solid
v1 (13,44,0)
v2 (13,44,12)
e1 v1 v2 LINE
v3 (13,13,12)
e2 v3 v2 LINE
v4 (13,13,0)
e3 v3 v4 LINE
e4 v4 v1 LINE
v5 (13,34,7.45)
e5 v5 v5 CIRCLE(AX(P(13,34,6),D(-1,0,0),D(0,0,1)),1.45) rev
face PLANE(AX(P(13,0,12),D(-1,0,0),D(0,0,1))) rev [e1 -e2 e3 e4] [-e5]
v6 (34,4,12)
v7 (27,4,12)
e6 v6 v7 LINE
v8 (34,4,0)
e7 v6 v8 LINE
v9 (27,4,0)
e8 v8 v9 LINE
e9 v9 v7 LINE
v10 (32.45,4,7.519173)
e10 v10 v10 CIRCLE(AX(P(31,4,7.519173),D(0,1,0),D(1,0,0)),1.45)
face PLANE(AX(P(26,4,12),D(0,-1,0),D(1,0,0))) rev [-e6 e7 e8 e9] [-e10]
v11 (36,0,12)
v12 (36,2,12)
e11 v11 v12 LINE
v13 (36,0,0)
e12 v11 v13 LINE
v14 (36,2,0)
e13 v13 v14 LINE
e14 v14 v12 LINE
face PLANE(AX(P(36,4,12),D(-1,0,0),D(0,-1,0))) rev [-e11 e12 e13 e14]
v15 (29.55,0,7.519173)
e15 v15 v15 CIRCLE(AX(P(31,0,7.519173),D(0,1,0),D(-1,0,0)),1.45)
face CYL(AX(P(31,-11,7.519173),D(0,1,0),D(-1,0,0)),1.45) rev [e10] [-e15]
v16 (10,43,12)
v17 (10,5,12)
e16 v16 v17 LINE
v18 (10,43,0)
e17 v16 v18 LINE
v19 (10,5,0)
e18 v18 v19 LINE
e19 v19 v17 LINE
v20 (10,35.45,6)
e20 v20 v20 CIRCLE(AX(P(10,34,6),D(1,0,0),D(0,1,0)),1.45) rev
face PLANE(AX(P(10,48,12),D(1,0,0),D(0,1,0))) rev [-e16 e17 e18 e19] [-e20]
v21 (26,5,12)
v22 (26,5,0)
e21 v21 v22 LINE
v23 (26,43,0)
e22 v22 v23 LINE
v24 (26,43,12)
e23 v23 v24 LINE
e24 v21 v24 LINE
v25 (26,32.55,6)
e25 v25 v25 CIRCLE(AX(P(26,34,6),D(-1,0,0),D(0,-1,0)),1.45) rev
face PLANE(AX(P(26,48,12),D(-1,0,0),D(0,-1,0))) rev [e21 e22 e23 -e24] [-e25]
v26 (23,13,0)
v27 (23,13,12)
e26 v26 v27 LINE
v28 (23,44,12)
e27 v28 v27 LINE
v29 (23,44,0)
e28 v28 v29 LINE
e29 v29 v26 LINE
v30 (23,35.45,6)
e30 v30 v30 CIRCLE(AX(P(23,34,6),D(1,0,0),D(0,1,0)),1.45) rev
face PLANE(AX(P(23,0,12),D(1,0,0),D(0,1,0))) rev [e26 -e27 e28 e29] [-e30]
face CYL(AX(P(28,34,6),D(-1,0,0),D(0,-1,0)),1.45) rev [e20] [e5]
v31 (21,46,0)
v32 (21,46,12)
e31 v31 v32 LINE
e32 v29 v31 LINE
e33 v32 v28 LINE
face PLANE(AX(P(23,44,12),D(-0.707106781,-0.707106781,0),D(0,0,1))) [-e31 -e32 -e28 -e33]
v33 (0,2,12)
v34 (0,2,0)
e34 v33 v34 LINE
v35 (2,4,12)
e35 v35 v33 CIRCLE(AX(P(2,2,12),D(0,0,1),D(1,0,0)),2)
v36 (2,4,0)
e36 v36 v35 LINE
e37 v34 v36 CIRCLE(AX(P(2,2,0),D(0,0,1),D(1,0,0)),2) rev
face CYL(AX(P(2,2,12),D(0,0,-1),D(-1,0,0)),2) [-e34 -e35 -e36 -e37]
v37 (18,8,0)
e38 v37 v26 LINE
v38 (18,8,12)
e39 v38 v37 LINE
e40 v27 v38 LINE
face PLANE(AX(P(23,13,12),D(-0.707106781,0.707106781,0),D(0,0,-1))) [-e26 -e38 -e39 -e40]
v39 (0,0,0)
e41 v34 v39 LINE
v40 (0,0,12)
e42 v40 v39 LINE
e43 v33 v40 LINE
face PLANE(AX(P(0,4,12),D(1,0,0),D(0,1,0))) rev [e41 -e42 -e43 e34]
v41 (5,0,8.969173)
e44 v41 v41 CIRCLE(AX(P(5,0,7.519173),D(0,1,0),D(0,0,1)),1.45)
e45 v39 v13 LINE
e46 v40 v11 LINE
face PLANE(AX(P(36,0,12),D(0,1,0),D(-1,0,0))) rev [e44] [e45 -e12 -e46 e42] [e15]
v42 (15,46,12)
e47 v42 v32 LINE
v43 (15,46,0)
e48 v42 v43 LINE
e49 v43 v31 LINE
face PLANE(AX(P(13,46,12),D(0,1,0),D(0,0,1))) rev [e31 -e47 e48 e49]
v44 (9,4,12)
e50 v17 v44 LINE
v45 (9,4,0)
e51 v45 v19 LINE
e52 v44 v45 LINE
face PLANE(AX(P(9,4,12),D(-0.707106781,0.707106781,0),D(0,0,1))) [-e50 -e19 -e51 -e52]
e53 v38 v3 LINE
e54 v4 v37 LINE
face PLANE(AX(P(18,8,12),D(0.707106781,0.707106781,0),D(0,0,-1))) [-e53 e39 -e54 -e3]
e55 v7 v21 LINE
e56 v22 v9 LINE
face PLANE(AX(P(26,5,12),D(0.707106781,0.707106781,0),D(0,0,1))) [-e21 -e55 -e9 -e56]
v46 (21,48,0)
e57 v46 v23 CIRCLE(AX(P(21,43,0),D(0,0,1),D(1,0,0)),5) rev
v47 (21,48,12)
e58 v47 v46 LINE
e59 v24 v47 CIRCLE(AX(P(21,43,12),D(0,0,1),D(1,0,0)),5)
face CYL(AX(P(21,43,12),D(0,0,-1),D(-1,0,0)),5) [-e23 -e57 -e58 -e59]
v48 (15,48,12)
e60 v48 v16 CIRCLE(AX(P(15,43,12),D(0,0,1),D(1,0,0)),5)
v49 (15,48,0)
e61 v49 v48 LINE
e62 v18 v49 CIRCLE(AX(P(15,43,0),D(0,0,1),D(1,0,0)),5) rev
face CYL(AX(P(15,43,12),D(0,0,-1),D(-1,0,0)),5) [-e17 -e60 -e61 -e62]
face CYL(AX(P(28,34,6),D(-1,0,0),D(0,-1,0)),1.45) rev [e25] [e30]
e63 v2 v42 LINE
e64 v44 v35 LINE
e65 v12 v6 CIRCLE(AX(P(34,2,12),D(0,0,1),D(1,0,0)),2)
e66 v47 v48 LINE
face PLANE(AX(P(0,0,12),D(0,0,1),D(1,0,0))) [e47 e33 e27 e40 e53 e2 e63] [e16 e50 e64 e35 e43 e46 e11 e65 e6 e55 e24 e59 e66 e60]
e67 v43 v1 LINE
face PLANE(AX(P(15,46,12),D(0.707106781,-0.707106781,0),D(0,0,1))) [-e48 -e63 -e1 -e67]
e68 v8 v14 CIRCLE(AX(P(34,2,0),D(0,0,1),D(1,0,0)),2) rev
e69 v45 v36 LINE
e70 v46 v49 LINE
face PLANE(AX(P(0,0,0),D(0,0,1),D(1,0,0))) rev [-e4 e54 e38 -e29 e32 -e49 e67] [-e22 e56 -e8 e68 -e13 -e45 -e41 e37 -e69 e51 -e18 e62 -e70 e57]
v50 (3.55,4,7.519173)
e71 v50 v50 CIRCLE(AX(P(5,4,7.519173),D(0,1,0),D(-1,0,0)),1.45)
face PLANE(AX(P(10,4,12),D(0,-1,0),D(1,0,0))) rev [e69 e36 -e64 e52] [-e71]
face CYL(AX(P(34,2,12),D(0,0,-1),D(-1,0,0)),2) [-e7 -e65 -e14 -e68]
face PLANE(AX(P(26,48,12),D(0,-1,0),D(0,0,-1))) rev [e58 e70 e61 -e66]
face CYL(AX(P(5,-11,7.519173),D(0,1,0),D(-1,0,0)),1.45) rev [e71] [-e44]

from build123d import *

# Parameters (mm, degrees)
EXTRUDE_1_DEPTH          = 12
CUT_EXTRUDE_1_DEPTH      = 15
CUT_EXTRUDE_1_DEPTH_BACK = 15
SKETCH_2_R               = 1.45
SKETCH_3_R               = 1.45
CUT_EXTRUDE_2_DEPTH      = 15
FILLET_2_R               = 5
FILLET_3_R               = 2
CHAMFER_1_SIZE           = 2
SKETCH_4_W               = 12
SKETCH_4_H               = 8
EXTRUDE_2_DEPTH          = 10
CHAMFER_2_SIZE           = 5
CHAMFER_3_SIZE           = 1


with BuildPart() as part:
    # 草图1 → 凸台-拉伸1 (new body)
    with BuildSketch(Plane.XY):
        Polygon((0, 0), (13, 0), (13, 46), (23, 46), (23, 0), (36, 0), (36, 4), (26, 4), (26, 48), (10, 48), (10, 4), (0, 4), align=None)
    extrude(amount=EXTRUDE_1_DEPTH)

    # 草图2 → 切除-拉伸1 (cut, two sides: drawn at the far end of the back side and taken through both)
    with BuildSketch(Plane(origin=(13, 0, 0), x_dir=(0, 0, -1), z_dir=(1, 0, 0)).offset(-CUT_EXTRUDE_1_DEPTH_BACK)):
        with Locations(Location((-6, 34, 0), (0, 0, 180))):
            Circle(SKETCH_2_R)
    extrude(amount=CUT_EXTRUDE_1_DEPTH + CUT_EXTRUDE_1_DEPTH_BACK, mode=Mode.SUBTRACT)

    # 草图3 → 切除-拉伸2 (cut)
    with BuildSketch(Plane(origin=(0, 4, 0), x_dir=(1, 0, 0), z_dir=(0, 1, 0))):
        with Locations(Location((5, -7.519173445, 0), (0, 0, 180))):
            Circle(SKETCH_3_R)
        with Locations(Location((31, -7.519173445, 0), (0, 0, 180))):
            Circle(SKETCH_3_R)
    extrude(amount=-CUT_EXTRUDE_2_DEPTH, mode=Mode.SUBTRACT)

    # 圆角2
    fillet_2_edges = [part.edges().sort_by_distance(p)[0] for p in [
        (10, 48, 6),
        (26, 48, 6),
    ]]
    fillet(fillet_2_edges, radius=FILLET_2_R)

    # 圆角3
    fillet_3_edges = [part.edges().sort_by_distance(p)[0] for p in [
        (0, 4, 6),
        (36, 4, 6),
    ]]
    fillet(fillet_3_edges, radius=FILLET_3_R)

    # 倒角1
    chamfer_1_edges = [part.edges().sort_by_distance(p)[0] for p in [
        (23, 46, 6),
        (13, 46, 6),
    ]]
    chamfer(chamfer_1_edges, length=CHAMFER_1_SIZE)

    # 草图4 → 凸台-拉伸2 (add)
    with BuildSketch(Plane(origin=(13, 0, 0), x_dir=(0, 0, -1), z_dir=(1, 0, 0))):
        with Locations((-6, 4)):
            Rectangle(SKETCH_4_W, SKETCH_4_H)
    extrude(amount=EXTRUDE_2_DEPTH)

    # 倒角2
    chamfer_2_edges = [part.edges().sort_by_distance(p)[0] for p in [
        (13, 8, 6),
        (23, 8, 6),
    ]]
    chamfer(chamfer_2_edges, length=CHAMFER_2_SIZE - 0.0001)  # a hair under: the kernel refuses the full size

    # 倒角3
    chamfer_3_edges = [part.edges().sort_by_distance(p)[0] for p in [
        (10, 4, 6),
        (26, 4, 6),
    ]]
    chamfer(chamfer_3_edges, length=CHAMFER_3_SIZE)


solid = part.part
